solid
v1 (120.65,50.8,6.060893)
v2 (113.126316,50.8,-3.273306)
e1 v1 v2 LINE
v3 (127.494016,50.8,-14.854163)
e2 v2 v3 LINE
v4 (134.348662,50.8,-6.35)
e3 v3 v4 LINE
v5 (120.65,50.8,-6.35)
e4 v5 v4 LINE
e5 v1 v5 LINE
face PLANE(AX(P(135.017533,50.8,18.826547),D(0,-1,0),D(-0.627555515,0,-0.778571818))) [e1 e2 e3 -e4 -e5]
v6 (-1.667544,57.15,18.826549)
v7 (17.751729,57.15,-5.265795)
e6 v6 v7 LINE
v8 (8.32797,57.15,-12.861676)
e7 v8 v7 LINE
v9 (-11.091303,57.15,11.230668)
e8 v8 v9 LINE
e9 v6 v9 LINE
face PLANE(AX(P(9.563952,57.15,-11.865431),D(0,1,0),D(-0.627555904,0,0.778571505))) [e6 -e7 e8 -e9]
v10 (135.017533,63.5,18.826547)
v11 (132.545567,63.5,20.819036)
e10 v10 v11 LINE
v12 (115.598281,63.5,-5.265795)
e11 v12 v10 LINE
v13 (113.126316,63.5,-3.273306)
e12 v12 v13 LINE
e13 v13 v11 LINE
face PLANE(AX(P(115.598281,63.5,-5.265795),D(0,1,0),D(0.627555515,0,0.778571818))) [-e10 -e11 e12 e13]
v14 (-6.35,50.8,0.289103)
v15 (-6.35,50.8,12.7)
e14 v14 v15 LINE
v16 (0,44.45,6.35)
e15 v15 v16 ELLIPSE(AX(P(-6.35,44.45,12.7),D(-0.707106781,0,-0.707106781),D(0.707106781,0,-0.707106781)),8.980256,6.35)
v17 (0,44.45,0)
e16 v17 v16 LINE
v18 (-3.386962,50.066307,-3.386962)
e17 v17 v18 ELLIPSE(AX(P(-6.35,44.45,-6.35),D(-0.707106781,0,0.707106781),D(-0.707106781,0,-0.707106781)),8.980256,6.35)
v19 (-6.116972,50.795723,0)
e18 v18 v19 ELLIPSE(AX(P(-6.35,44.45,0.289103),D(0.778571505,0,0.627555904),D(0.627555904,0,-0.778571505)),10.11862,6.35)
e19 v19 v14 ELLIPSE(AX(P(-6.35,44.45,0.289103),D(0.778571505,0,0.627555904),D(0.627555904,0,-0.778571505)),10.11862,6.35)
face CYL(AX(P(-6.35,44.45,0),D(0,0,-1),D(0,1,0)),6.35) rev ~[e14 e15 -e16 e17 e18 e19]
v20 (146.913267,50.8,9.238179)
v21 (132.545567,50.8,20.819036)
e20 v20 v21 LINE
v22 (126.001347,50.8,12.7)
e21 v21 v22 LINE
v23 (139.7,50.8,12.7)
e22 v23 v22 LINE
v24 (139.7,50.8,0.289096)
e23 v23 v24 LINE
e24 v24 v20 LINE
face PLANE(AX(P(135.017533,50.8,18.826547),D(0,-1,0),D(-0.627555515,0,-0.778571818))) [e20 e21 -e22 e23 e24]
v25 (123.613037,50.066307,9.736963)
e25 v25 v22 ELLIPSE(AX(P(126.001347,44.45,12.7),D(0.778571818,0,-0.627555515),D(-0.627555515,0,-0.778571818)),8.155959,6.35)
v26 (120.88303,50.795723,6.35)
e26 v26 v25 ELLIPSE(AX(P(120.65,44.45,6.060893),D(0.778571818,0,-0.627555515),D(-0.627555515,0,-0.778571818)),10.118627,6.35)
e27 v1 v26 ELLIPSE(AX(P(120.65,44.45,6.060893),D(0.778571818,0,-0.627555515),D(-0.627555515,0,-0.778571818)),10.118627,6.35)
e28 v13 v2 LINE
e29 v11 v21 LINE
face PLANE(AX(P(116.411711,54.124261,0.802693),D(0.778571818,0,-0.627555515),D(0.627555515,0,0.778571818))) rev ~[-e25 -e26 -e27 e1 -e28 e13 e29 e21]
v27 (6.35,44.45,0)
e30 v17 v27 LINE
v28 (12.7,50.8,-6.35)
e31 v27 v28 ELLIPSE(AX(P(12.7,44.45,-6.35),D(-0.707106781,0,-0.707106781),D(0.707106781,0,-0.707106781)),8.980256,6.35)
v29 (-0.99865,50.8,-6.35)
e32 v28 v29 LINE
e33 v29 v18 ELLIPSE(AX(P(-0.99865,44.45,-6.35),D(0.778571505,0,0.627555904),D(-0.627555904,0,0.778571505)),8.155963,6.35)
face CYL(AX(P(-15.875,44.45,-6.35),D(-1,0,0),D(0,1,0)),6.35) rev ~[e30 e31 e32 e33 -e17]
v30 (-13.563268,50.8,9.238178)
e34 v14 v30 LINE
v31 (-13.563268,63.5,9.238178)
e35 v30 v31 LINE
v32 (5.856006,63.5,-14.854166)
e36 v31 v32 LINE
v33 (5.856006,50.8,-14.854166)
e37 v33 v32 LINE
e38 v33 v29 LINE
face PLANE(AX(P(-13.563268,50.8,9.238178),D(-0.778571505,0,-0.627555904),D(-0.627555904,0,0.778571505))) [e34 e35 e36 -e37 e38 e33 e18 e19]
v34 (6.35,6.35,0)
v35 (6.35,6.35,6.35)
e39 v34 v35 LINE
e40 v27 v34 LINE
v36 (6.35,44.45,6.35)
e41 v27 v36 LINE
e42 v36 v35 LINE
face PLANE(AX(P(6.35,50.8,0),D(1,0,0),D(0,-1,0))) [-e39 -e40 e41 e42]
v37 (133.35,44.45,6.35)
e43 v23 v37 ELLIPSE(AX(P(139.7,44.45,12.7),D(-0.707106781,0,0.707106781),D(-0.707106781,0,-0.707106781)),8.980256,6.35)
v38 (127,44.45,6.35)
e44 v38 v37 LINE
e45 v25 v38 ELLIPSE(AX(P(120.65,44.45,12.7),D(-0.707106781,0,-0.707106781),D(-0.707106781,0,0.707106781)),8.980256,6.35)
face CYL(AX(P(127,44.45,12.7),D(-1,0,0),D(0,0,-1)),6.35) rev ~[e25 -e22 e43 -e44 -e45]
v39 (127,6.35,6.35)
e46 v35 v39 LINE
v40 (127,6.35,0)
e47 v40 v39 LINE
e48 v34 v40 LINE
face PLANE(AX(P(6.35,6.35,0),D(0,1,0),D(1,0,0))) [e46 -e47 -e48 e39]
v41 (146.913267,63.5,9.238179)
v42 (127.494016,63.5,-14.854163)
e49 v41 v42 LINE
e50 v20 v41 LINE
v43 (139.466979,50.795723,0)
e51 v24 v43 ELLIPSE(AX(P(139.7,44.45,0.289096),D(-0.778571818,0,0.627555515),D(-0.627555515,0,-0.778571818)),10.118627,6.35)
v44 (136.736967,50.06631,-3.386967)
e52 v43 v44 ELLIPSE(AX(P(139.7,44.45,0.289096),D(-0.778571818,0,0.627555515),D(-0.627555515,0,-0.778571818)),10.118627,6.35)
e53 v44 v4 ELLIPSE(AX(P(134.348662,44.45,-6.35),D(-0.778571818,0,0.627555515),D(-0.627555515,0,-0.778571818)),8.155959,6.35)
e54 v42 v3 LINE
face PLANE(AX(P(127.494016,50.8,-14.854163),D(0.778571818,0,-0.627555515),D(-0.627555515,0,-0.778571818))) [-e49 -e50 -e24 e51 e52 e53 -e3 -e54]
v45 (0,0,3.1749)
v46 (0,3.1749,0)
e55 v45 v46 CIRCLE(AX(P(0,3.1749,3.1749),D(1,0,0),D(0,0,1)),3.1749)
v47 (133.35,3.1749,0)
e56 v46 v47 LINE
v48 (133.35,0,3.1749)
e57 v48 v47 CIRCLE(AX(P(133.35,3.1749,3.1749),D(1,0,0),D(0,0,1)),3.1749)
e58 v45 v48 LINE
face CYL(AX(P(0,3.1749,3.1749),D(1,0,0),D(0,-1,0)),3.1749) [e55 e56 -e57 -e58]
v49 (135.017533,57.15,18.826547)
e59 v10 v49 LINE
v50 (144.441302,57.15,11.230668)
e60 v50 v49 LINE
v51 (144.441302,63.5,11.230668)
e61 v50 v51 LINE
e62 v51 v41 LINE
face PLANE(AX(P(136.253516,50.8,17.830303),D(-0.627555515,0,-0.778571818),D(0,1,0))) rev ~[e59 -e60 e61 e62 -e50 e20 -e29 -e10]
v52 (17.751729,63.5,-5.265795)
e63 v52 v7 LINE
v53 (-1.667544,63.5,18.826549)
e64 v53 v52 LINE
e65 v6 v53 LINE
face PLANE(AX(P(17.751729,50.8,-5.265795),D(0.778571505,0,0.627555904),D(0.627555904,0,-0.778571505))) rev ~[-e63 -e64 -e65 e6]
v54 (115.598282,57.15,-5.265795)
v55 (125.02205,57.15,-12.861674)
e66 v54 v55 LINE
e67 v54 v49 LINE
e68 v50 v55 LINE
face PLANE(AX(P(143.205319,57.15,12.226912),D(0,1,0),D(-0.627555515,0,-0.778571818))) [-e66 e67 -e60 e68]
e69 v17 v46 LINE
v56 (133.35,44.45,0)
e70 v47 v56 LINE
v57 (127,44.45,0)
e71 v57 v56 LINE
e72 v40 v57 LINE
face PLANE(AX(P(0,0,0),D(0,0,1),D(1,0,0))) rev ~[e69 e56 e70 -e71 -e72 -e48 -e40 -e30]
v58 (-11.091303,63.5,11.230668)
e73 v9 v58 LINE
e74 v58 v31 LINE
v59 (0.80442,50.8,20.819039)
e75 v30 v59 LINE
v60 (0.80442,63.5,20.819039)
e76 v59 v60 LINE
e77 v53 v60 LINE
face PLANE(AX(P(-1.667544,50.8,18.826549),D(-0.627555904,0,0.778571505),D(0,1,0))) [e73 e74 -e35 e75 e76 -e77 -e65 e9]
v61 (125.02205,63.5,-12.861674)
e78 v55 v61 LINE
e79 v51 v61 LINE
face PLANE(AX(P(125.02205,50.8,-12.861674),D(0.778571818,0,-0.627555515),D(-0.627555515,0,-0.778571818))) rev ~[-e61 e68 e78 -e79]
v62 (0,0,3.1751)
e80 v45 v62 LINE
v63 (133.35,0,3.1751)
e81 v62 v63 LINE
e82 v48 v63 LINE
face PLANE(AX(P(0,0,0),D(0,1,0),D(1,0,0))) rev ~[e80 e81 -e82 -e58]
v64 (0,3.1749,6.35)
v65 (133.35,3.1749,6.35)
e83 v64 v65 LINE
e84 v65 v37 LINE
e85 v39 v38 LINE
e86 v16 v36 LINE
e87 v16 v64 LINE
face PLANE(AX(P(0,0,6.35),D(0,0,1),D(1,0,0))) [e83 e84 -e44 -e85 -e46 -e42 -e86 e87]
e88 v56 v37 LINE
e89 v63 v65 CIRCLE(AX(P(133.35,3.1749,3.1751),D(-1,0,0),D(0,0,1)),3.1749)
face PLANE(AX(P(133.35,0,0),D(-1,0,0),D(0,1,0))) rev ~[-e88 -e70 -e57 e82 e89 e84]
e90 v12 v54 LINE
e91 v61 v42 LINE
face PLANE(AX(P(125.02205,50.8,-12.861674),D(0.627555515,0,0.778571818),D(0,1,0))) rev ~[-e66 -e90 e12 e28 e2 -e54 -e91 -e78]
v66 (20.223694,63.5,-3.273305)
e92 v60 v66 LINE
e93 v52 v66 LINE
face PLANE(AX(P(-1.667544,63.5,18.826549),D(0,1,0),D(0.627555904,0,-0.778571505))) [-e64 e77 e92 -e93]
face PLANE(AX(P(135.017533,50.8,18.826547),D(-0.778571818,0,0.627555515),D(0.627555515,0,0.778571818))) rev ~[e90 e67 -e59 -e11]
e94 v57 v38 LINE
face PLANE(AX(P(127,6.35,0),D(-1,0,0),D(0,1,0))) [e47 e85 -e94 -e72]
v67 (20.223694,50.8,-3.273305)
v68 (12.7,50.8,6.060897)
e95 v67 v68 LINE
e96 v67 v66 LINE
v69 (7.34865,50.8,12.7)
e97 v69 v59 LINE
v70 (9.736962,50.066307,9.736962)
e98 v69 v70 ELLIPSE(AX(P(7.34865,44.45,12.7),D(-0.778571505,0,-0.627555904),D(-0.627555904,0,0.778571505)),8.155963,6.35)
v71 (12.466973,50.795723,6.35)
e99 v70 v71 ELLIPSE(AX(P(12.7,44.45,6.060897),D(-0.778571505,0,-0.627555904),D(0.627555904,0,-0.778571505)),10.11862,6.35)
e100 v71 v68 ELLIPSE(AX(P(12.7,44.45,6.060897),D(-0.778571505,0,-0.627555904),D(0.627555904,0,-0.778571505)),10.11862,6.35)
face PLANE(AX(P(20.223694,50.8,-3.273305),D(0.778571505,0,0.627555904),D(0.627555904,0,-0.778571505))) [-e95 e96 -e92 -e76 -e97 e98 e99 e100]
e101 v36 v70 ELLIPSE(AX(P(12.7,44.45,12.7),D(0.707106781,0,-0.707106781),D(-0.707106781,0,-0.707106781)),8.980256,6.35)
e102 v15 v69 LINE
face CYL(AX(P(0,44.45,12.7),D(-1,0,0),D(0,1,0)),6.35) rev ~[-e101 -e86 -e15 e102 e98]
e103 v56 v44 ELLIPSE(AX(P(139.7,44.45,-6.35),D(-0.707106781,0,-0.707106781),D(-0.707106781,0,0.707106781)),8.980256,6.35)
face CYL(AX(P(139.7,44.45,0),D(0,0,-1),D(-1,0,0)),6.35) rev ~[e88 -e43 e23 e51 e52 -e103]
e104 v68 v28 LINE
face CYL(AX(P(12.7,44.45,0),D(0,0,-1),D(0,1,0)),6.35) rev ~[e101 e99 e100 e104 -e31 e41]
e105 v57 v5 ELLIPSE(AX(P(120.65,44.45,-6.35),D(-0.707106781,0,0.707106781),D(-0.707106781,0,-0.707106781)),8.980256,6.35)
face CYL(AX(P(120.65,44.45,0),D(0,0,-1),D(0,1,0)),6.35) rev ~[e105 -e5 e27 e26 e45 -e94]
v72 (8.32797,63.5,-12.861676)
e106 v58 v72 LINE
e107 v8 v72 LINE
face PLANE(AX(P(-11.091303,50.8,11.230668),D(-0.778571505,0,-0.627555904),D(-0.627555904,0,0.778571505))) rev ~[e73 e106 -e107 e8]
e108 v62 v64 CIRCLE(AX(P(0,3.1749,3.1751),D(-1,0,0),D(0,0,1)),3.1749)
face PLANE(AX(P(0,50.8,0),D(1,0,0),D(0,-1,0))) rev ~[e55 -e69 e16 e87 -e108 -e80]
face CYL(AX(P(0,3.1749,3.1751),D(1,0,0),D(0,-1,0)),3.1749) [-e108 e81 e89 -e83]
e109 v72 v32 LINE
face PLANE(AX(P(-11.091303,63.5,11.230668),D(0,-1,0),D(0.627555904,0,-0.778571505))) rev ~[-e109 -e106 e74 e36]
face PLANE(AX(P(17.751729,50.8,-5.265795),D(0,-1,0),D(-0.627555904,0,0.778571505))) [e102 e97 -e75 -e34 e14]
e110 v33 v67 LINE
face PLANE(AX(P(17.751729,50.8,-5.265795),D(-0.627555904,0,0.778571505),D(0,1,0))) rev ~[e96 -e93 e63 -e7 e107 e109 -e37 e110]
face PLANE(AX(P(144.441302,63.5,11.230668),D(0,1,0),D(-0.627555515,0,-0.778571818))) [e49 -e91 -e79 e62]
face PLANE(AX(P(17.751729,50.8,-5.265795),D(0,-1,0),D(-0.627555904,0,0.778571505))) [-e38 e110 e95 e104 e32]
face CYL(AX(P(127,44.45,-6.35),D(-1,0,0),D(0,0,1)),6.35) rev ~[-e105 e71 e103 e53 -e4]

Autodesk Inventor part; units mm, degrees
ref_plane "YZ Plane" through (0, 0, 0) normal (1, 0, 0) x (0, 1, 0)
ref_plane "XZ Plane" through (0, 0, 0) normal (0, 1, 0) x (-1, 0, 0)
ref_plane "XY Plane" through (0, 0, 0) normal (0, 0, 1) x (1, 0, 0)
sketch "Sketch1" plane through (0, 0, 0) normal (0, 0, 1) x (1, 0, 0)
  line L0 (0, 0) -> (133.35, 0)
  line L1 (133.35, 0) -> (133.35, 50.8)
  line L2 (0, 50.8) -> (0, 0)
  line L3 (0, 50.8) -> (6.35, 50.8)
  line L4 (6.35, 50.8) -> (6.35, 6.35)
  line L5 (6.35, 6.35) -> (127, 6.35)
  line L6 (127, 6.35) -> (127, 50.8)
  line L7 (127, 50.8) -> (133.35, 50.8)
  dimension "d1" = 50.8
  dimension "d2" = 6.35
  dimension "d3" = 44.45
  dimension "d4" = 120.65
  dimension "d5" = 133.35
extrude "Extrusion1" add sketch "Sketch1" along normal blind 6.35
fillet "Fillet1" radius 3.175 2 edges at (66.675, 0, 6.35) (66.675, 0, 0)
sketch "Sketch2" plane through (0, 50.8, 0) normal (0, 1, 0) x (1, 0, 0)
  line L0 (6.35, -6.35) -> (16.515747, 6.26204)
  line L1 (-2.903527, -17.830303) -> (6.35, -6.35)
  line L2 (16.515747, 6.26204) -> (9.563953, 11.86543)
  line L3 (9.563953, 11.86543) -> (-9.855321, -12.226913)
  line L4 (-9.855321, -12.226913) -> (-2.903527, -17.830303)
  line L5 (127, 0) -> (127, -6.35)
  line L6 (127, -6.35) -> (143.198942, -6.35) construction
  line L7 (116.834265, 6.26204) -> (123.786067, 11.86543)
  line L8 (123.786067, 11.86543) -> (143.205318, -12.226913)
  line L9 (143.205318, -12.226913) -> (136.253516, -17.830303)
  line L10 (133.35, -6.35) -> (127, -6.35)
  line L11 (116.834265, 6.26204) -> (136.253516, -17.830303)
  point P0 (0, 0)
extrude "Extrusion2" add sketch "Sketch2" along normal blind 6.35
sketch "Sketch4" plane through (16.515747, 50.8, -6.26204) normal (0.7785715, 0, 0.6275559) x (0.6275559, 0, -0.7785715)
  point P0 (-15.240001, -50.8)
sketch "Sketch5" plane through (16.515747, 50.8, -6.26204) normal (0.7785715, 0, 0.6275559) x (0.6275559, 0, -0.7785715)
  point P0 (-15.240001, -50.8)
sketch "Sketch6" plane through (16.515747, 50.8, -6.26204) normal (0.7785715, 0, 0.6275559) x (0.6275559, 0, -0.7785715)
  line L0 (-30.944292, 6.35) -> (0, 6.35)
  line L1 (-30.944292, 0) -> (-30.944292, 6.35)
  line L2 (-30.944292, 6.35) -> (-30.944292, 0)
  line L3 (0, 0) -> (0, 6.35)
  line L4 (-30.944292, 0) -> (0, 0)
  line L5 (0, 0) -> (0, 6.35)
  line L6 (0, 6.35) -> (-30.944292, 6.35)
  point P0 (-15.240001, -50.8)
extrude "Extrusion3" add sketch "Sketch6" along normal blind 1.5875
sketch "Sketch7" plane through (-9.855321, 50.8, 12.226913) normal (-0.7785715, 0, -0.6275559) x (-0.6275559, 0, 0.7785715)
  line L0 (-30.944292, 6.35) -> (0, 6.35)
  line L1 (0, 0) -> (-30.944292, 0)
  line L2 (-30.944292, 6.35) -> (-30.944292, 0)
  line L3 (-30.944292, 0) -> (0, 0)
  line L4 (0, 6.35) -> (0, 0)
  line L5 (0, 0) -> (0, 6.35)
  line L6 (0, 6.35) -> (-30.944292, 6.35)
  point P0 (-15.704291, -50.8)
extrude "Extrusion4" add sketch "Sketch7" along normal blind 1.5875
sketch "Sketch8" plane through (136.253516, 50.8, 17.830303) normal (-0.7785718, 0, 0.6275555) x (0.6275555, 0, 0.7785718)
  line L0 (-30.944277, 6.35) -> (0, 6.35)
  line L1 (0, 0) -> (0, 6.35)
  line L2 (-30.944277, 6.35) -> (0, 6.35)
  line L3 (0, 6.35) -> (0, 0)
  line L4 (0, 0) -> (-30.944277, 0)
  line L5 (-30.944277, 0) -> (-30.944277, 6.35)
  line L6 (-30.944277, 0) -> (-30.944277, 6.35)
  point P0 (-99.388813, -50.8)
extrude "Extrusion5" add sketch "Sketch8" along normal blind 1.5875
sketch "Sketch9" plane through (123.786067, 50.8, -11.86543) normal (0.7785718, 0, -0.6275555) x (-0.6275555, 0, -0.7785718)
  line L0 (-30.944277, 6.35) -> (0, 6.35)
  line L1 (-30.944277, 6.35) -> (0, 6.35)
  line L2 (0, 0) -> (-30.944277, 0)
  line L3 (0, 6.35) -> (0, 0)
  line L4 (0, 0) -> (-30.944277, 0)
  line L5 (-30.944277, 0) -> (-30.944277, 6.35)
  point P0 (68.444536, -50.8)
extrude "Extrusion6" add sketch "Sketch9" along normal blind 1.5875
sketch "Sketch10" plane through (125.02205, 50.8, -12.861674) normal (0.7785718, 0, -0.6275555) x (-0.6275555, 0, -0.7785718)
  point P0 (68.444536, -50.8)
sketch "Sketch11" plane through (125.02205, 50.8, -12.861674) normal (0.7785718, 0, -0.6275555) x (-0.6275555, 0, -0.7785718)
  line L0 (0, 0) -> (0, 6.35)
  line L1 (0, 0) -> (0, 12.7)
  line L2 (-30.944277, 6.35) -> (-30.944277, 0)
  line L3 (0, 0) -> (-30.944277, 0)
  line L4 (-30.944277, 0) -> (-30.944277, 12.7)
  line L5 (-30.944277, 12.7) -> (0, 12.7)
  point P0 (68.444536, -50.8)
  point P1 (0, 6.35)
  point P2 (-30.944277, 6.35)
  dimension "d40" = 12.7
extrude "Extrusion7" add sketch "Sketch11" along normal blind 3.175
sketch "Sketch12" plane through (135.017533, 50.8, 18.826547) normal (-0.7785718, 0, 0.6275555) x (0.6275555, 0, 0.7785718)
  line L0 (0, 12.7) -> (0, 0)
  line L1 (0, 0) -> (0, 12.7)
  line L2 (-30.944277, 12.7) -> (0, 12.7)
  line L3 (0, 12.7) -> (-30.944277, 12.7)
  line L4 (0, 0) -> (-30.944277, 0)
  line L5 (-30.944277, 12.7) -> (-30.944277, 0)
  line L6 (-30.944277, 0) -> (0, 0)
  point P0 (-99.388813, -50.8)
extrude "Extrusion8" add sketch "Sketch12" along normal blind 3.175
sketch "Sketch13" plane through (-11.091303, 50.8, 11.230668) normal (-0.7785715, 0, -0.6275559) x (-0.6275559, 0, 0.7785715)
  line L0 (-30.944292, 0) -> (-30.944292, 6.35)
  line L1 (-30.944292, 0) -> (-30.944292, 12.7)
  line L2 (0, 6.35) -> (0, 0)
  line L3 (-30.944292, 0) -> (0, 0)
  line L4 (0, 0) -> (0, 12.7)
  line L5 (0, 12.7) -> (-30.944292, 12.7)
  point P0 (-15.704291, -50.8)
  point P1 (-30.944292, 6.35)
  dimension "d45" = 12.7
extrude "Extrusion9" add sketch "Sketch13" along normal blind 3.175
sketch "Sketch14" plane through (17.751729, 50.8, -5.265795) normal (0.7785715, 0, 0.6275559) x (0.6275559, 0, -0.7785715)
  line L0 (-30.944292, 0) -> (-30.944292, 6.35)
  line L1 (-30.944292, 0) -> (-30.944292, 12.7)
  line L2 (-30.944292, 12.7) -> (0, 12.7)
  line L3 (-30.944292, 12.7) -> (0, 12.7)
  line L4 (0, 0) -> (0, 6.35)
  line L5 (0, 12.7) -> (0, 0)
  line L6 (0, 0) -> (-30.944292, 0)
  point P0 (-15.240001, -50.8)
  point P1 (0, 6.35)
  point P2 (-30.944292, 12.7)
  point P3 (-30.944292, 6.35)
  dimension "d8" = 3.175
extrude "Extrusion10" add sketch "Sketch14" along normal blind 3.175
fillet "Fillet4" radius 6.35 8 edges at (133.35, 50.8, 3.175) (130.175, 50.8, 0) (127, 50.8, 3.175) (130.175, 50.8, 6.35) (6.35, 50.8, 3.175) (3.175, 50.8, 6.35) (0, 50.8, 3.175) (3.175, 50.8, 0)
properties part number "landing_3DPrint"
